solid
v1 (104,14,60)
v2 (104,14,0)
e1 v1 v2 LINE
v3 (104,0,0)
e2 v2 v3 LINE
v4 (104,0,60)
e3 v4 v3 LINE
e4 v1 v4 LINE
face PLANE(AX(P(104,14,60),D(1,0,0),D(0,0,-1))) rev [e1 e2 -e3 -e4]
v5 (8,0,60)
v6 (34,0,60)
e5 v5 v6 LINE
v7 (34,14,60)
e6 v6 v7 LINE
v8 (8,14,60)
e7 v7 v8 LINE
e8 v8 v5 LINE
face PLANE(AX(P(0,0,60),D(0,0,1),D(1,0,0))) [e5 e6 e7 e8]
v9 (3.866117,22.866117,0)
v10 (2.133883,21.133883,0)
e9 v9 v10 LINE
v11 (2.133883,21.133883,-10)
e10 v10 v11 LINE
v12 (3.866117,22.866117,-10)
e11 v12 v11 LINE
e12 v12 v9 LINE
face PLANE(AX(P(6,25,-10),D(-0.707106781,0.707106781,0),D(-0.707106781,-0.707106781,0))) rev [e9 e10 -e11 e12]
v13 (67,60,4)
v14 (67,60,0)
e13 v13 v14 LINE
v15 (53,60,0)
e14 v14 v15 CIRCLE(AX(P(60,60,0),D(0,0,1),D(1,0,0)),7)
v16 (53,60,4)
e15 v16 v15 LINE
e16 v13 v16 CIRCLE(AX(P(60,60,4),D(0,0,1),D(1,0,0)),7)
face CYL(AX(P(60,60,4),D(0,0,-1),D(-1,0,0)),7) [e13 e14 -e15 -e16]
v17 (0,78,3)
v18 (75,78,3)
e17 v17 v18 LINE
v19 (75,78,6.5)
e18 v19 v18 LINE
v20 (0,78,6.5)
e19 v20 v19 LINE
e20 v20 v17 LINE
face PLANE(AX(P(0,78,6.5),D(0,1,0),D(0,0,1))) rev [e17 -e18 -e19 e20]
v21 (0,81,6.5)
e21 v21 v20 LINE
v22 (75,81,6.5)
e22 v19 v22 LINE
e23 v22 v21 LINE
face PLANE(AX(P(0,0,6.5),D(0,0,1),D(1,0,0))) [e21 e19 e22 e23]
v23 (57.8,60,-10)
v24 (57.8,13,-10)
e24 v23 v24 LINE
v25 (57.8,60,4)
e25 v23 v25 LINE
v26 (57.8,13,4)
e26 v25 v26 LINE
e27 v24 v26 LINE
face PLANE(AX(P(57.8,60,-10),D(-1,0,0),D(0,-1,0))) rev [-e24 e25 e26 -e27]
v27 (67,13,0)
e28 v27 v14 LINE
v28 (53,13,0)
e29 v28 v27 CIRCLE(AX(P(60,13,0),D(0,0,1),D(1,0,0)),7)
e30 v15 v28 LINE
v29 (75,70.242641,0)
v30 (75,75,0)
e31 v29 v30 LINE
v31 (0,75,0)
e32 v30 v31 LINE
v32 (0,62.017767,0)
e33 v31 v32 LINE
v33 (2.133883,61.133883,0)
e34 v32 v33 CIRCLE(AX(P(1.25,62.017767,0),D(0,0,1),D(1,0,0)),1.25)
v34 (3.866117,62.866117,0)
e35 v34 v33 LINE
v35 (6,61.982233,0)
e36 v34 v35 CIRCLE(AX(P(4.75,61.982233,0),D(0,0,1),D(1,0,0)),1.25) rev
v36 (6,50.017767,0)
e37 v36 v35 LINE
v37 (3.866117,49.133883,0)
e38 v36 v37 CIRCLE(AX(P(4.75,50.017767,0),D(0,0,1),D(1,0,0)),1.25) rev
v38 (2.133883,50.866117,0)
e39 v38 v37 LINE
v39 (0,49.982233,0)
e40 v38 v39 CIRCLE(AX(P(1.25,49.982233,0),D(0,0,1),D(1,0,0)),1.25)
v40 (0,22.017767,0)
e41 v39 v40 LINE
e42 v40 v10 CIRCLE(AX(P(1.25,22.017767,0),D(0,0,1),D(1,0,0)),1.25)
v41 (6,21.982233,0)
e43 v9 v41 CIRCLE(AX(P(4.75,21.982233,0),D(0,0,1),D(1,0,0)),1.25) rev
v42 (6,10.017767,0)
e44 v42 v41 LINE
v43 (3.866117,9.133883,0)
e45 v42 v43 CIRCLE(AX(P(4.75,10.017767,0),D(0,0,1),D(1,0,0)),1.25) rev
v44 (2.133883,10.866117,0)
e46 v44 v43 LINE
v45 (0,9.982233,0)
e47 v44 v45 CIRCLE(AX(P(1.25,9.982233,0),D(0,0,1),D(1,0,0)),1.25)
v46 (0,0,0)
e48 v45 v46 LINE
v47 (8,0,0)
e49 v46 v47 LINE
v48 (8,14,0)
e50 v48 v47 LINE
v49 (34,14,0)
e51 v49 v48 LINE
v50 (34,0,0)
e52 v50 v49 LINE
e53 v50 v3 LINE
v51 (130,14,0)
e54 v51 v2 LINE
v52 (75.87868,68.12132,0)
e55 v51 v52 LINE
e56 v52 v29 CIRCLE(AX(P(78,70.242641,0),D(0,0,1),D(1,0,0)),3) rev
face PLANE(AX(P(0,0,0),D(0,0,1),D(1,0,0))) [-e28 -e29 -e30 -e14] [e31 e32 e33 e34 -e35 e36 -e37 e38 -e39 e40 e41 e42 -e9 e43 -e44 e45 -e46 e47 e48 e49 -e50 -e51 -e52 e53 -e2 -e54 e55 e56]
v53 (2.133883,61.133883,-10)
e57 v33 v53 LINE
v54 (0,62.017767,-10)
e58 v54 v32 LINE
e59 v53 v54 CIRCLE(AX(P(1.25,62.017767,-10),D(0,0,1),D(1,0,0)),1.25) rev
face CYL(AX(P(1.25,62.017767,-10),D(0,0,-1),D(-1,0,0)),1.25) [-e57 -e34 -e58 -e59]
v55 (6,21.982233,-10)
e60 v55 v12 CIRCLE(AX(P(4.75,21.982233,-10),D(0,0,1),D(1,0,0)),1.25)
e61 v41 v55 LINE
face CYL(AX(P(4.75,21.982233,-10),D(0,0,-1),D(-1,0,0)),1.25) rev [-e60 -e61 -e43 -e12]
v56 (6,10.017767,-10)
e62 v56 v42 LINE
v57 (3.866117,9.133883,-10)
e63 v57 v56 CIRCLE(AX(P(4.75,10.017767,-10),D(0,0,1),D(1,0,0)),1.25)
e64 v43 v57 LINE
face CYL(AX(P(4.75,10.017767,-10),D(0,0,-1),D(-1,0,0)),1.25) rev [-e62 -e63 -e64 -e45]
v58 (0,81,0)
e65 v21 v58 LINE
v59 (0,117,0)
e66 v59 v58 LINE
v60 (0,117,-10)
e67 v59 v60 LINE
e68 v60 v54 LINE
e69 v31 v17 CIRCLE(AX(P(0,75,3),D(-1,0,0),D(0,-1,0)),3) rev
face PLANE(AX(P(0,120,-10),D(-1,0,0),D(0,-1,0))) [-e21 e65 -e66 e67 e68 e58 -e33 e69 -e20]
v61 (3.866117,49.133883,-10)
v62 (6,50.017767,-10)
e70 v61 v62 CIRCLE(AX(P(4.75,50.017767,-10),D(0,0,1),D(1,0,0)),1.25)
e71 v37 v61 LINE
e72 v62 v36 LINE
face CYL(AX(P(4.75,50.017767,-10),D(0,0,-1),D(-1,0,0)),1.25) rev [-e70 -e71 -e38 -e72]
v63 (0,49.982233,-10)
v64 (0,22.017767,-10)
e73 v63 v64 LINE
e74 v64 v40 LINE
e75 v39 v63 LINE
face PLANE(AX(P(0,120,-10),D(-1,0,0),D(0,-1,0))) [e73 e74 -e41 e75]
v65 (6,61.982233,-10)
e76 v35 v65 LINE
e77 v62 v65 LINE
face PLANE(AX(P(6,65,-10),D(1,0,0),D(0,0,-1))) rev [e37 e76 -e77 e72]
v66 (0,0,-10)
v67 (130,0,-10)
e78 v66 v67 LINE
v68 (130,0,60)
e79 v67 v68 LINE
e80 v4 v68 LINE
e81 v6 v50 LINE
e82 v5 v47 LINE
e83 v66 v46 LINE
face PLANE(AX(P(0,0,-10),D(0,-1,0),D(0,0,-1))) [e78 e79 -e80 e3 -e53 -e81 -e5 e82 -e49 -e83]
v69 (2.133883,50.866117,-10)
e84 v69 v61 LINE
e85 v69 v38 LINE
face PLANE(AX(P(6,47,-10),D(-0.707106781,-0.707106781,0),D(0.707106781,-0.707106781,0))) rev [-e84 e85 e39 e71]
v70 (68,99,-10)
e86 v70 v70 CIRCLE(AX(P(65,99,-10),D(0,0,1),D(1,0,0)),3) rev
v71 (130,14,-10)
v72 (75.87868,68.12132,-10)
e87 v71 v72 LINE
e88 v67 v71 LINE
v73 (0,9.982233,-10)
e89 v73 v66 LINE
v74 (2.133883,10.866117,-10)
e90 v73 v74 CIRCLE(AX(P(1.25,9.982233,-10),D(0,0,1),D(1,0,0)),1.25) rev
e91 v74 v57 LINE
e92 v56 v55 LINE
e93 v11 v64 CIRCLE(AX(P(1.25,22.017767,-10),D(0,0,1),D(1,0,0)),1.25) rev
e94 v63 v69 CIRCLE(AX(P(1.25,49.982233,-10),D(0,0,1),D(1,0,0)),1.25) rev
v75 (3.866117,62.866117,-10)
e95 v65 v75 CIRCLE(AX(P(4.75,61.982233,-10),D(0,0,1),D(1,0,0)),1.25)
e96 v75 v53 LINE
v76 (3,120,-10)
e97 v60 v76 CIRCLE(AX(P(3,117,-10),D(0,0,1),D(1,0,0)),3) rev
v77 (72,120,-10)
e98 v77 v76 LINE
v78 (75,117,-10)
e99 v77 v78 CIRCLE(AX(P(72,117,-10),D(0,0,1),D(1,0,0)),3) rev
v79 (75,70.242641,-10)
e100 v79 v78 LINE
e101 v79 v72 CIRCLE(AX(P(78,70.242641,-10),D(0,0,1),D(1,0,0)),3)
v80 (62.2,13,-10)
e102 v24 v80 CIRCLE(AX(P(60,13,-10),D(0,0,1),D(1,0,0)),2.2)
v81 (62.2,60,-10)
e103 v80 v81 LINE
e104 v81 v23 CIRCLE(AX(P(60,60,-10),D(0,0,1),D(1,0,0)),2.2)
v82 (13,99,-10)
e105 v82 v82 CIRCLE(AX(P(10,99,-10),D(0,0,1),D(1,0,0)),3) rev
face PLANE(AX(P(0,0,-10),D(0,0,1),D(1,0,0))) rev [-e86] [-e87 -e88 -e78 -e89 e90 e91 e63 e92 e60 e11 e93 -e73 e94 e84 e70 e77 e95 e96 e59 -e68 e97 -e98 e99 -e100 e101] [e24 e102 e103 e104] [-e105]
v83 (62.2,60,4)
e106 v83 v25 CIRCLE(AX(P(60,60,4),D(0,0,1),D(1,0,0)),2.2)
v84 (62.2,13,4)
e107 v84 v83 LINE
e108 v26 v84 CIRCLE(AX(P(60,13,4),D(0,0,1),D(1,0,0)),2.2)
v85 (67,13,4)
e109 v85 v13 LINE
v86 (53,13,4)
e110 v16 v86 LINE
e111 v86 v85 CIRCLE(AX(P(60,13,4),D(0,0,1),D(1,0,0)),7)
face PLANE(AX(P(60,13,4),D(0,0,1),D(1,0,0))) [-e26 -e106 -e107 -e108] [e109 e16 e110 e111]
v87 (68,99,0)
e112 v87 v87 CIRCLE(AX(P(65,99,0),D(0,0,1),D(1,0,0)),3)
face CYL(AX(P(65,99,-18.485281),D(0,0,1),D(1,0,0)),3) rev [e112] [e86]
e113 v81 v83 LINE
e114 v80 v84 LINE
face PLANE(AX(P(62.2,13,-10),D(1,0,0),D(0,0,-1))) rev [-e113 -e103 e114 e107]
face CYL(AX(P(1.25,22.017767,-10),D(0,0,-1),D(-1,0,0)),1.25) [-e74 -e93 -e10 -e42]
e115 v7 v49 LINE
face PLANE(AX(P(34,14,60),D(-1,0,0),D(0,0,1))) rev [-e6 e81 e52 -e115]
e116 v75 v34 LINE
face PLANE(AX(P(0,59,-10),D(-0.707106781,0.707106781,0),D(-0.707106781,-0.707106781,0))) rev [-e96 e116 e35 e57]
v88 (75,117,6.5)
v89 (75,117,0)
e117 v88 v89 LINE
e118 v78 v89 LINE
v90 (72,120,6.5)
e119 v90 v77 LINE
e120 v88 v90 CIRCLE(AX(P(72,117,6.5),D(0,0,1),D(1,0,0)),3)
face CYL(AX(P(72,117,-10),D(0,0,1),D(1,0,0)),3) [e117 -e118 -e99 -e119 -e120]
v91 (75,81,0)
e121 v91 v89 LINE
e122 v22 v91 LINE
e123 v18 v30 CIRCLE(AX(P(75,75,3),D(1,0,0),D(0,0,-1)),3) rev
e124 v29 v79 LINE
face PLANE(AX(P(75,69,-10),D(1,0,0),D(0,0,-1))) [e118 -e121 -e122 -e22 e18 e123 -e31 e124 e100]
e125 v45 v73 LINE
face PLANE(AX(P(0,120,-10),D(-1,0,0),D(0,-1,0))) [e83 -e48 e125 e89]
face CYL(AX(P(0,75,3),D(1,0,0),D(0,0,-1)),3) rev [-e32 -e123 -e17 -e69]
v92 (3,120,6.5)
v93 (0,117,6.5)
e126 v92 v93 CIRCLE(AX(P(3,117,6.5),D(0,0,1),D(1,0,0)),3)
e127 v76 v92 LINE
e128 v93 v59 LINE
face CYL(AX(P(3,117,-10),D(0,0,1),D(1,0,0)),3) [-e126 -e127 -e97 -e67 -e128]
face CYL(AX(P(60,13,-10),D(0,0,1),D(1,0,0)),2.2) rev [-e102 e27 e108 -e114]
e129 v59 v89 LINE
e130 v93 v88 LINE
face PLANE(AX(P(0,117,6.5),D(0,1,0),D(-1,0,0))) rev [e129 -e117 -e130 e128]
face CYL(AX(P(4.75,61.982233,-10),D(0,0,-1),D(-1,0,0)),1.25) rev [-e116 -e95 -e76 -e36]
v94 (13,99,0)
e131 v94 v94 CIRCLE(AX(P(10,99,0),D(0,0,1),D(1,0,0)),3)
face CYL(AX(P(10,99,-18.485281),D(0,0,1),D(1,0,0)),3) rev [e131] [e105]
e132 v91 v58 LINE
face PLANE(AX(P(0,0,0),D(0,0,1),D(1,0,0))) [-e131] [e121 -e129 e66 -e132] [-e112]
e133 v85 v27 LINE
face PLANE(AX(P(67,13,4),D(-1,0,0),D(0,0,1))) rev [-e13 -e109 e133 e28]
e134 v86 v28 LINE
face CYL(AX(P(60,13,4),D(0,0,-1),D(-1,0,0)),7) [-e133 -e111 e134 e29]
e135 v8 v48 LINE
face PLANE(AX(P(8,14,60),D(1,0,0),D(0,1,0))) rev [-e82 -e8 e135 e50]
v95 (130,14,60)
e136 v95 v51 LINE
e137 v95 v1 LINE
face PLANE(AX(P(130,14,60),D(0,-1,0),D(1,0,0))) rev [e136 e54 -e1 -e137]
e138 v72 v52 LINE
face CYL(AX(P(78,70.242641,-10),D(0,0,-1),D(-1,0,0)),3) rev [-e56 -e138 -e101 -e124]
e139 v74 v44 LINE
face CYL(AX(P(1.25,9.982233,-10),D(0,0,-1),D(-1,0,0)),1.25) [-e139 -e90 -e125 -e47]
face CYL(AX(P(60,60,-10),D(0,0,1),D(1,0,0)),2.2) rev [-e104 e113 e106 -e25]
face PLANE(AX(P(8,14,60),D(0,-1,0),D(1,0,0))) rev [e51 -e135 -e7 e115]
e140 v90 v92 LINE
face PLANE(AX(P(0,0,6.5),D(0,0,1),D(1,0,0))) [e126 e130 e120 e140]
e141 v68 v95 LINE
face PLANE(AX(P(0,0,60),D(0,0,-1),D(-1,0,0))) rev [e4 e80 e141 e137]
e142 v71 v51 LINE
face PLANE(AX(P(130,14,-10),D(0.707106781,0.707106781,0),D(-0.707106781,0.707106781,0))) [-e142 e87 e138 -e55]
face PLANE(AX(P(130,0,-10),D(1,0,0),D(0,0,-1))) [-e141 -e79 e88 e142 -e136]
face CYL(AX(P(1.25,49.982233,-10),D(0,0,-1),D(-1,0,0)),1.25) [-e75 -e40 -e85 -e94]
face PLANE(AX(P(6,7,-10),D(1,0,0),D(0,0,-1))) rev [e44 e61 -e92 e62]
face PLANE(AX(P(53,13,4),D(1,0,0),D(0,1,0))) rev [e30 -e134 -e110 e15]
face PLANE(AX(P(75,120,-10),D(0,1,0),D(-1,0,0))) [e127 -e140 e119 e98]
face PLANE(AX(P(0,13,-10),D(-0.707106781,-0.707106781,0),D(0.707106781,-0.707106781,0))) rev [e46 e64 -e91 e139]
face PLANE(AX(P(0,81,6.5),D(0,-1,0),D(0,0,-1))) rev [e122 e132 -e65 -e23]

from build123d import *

# Parameters (mm, degrees)
BOSS_EXTRUDE1_DEPTH = 10
SKETCH3_W           = 75
SKETCH3_H           = 3
BOSS_EXTRUDE2_DEPTH = 6.5
SKETCH4_R           = 3
CUT_EXTRUDE2_DEPTH  = 10
SKETCH5_W           = 26
SKETCH5_H           = 14
BOSS_EXTRUDE3_DEPTH = 60
BOSS_EXTRUDE5_DEPTH = 4
CUT_EXTRUDE3_DEPTH  = 186.569394028
FILLET2_START       = -10
FILLET2_DEPTH       = 10
FILLET2_2_DEPTH     = 75
FILLET2_START_2     = -11
FILLET2_3_DEPTH     = 18
CUT_EXTRUDE4_DEPTH  = 187.815416923
FILLET3_R           = 1.25


with BuildPart() as part:
    # Sketch2 → Boss-Extrude1 (new body)
    with BuildSketch(Plane.XY):
        Polygon((0, 0), (130, 0), (130, 14), (75, 69), (75, 120), (0, 120), align=None)
    extrude(amount=-BOSS_EXTRUDE1_DEPTH)

    # Sketch3 → Boss-Extrude2 (add)
    with BuildSketch(Plane.XY):
        with Locations((37.5, 118.5)):
            Rectangle(SKETCH3_W, SKETCH3_H)
        with Locations((37.5, 79.5)):
            Rectangle(SKETCH3_W, SKETCH3_H)
    extrude(amount=BOSS_EXTRUDE2_DEPTH)

    # Sketch4 → Cut-Extrude2 (cut)
    with BuildSketch(Plane.XY):
        with Locations((10, 99)):
            Circle(SKETCH4_R)
        with Locations((65, 99)):
            Circle(SKETCH4_R)
    extrude(amount=-CUT_EXTRUDE2_DEPTH, mode=Mode.SUBTRACT)

    # Sketch5 → Boss-Extrude3 (add)
    with BuildSketch(Plane.XY):
        with Locations((117, 7)):
            Rectangle(SKETCH5_W, SKETCH5_H)
        with Locations((21, 7)):
            Rectangle(SKETCH5_W, SKETCH5_H)
    extrude(amount=BOSS_EXTRUDE3_DEPTH)

    # Sketch7 → Boss-Extrude5 (add)
    with BuildSketch(Plane.XY):
        with BuildLine():
            Line((53, 13), (53, 60))
            ThreePointArc((53, 60), (60, 67), (67, 60))
            Line((67, 60), (67, 13))
            ThreePointArc((67, 13), (60, 6), (53, 13))
        make_face()
    extrude(amount=BOSS_EXTRUDE5_DEPTH)

    # Sketch8 → Cut-Extrude3 (cut, through all)
    with BuildSketch(Plane.XY.offset(4)):
        with BuildLine():
            Line((62.2, 13), (62.2, 60))
            ThreePointArc((62.2, 60), (60, 62.2), (57.8, 60))
            Line((57.8, 60), (57.8, 13))
            ThreePointArc((57.8, 13), (60, 10.8), (62.2, 13))
        make_face()
    extrude(amount=-CUT_EXTRUDE3_DEPTH, mode=Mode.SUBTRACT)

    # Fillet2: read off the stored shape, not the designer's step
    # Fillet2 outline → Fillet2 (add)
    with BuildSketch(Plane.XY.offset(FILLET2_START)):
        with BuildLine():
            ThreePointArc((75.878679656, 68.121320344), (75.228361402, 69.09459039), (75, 70.242640687))
            Line((75, 70.242640687), (75, 69))
            Line((75, 69), (75.878679656, 68.121320344))
        make_face()
    extrude(amount=FILLET2_DEPTH)

    # Fillet2 2 outline → Fillet2 2 (add)
    with BuildSketch(Plane.YZ):
        with BuildLine():
            ThreePointArc((78, 3), (77.121320344, 0.878679656), (75, 0))
            Line((75, 0), (78, 0))
            Line((78, 0), (78, 3))
        make_face()
    extrude(amount=FILLET2_2_DEPTH)

    # Fillet2 3 outline → Fillet2 3 (cut)
    with BuildSketch(Plane.XY.offset(FILLET2_START_2)):
        with BuildLine():
            ThreePointArc((0, 117), (0.878679656, 119.121320344), (3, 120))
            Line((3, 120), (0, 120))
            Line((0, 120), (0, 117))
        make_face()
        with BuildLine():
            ThreePointArc((72, 120), (74.121320344, 119.121320344), (75, 117))
            Line((75, 117), (75, 120))
            Line((75, 120), (72, 120))
        make_face()
    extrude(amount=FILLET2_3_DEPTH, mode=Mode.SUBTRACT)

    # Sketch6 → Cut-Extrude4 (cut, through all)
    with BuildSketch(Plane.XY):
        Polygon((0, 13), (6, 7), (6, 25), (0, 19), align=None)
        Polygon((6, 47), (0, 53), (0, 59), (6, 65), align=None)
    extrude(amount=-CUT_EXTRUDE4_DEPTH, mode=Mode.SUBTRACT)

    # Fillet3
    fillet3_edges = [part.edges().sort_by_distance(p)[0] for p in [
        (0, 13, -5),
        (0, 19, -5),
        (6, 25, -5),
        (6, 7, -5),
        (6, 65, -5),
        (6, 47, -5),
        (0, 53, -5),
        (0, 59, -5),
    ]]
    fillet(fillet3_edges, radius=FILLET3_R)


solid = part.part
